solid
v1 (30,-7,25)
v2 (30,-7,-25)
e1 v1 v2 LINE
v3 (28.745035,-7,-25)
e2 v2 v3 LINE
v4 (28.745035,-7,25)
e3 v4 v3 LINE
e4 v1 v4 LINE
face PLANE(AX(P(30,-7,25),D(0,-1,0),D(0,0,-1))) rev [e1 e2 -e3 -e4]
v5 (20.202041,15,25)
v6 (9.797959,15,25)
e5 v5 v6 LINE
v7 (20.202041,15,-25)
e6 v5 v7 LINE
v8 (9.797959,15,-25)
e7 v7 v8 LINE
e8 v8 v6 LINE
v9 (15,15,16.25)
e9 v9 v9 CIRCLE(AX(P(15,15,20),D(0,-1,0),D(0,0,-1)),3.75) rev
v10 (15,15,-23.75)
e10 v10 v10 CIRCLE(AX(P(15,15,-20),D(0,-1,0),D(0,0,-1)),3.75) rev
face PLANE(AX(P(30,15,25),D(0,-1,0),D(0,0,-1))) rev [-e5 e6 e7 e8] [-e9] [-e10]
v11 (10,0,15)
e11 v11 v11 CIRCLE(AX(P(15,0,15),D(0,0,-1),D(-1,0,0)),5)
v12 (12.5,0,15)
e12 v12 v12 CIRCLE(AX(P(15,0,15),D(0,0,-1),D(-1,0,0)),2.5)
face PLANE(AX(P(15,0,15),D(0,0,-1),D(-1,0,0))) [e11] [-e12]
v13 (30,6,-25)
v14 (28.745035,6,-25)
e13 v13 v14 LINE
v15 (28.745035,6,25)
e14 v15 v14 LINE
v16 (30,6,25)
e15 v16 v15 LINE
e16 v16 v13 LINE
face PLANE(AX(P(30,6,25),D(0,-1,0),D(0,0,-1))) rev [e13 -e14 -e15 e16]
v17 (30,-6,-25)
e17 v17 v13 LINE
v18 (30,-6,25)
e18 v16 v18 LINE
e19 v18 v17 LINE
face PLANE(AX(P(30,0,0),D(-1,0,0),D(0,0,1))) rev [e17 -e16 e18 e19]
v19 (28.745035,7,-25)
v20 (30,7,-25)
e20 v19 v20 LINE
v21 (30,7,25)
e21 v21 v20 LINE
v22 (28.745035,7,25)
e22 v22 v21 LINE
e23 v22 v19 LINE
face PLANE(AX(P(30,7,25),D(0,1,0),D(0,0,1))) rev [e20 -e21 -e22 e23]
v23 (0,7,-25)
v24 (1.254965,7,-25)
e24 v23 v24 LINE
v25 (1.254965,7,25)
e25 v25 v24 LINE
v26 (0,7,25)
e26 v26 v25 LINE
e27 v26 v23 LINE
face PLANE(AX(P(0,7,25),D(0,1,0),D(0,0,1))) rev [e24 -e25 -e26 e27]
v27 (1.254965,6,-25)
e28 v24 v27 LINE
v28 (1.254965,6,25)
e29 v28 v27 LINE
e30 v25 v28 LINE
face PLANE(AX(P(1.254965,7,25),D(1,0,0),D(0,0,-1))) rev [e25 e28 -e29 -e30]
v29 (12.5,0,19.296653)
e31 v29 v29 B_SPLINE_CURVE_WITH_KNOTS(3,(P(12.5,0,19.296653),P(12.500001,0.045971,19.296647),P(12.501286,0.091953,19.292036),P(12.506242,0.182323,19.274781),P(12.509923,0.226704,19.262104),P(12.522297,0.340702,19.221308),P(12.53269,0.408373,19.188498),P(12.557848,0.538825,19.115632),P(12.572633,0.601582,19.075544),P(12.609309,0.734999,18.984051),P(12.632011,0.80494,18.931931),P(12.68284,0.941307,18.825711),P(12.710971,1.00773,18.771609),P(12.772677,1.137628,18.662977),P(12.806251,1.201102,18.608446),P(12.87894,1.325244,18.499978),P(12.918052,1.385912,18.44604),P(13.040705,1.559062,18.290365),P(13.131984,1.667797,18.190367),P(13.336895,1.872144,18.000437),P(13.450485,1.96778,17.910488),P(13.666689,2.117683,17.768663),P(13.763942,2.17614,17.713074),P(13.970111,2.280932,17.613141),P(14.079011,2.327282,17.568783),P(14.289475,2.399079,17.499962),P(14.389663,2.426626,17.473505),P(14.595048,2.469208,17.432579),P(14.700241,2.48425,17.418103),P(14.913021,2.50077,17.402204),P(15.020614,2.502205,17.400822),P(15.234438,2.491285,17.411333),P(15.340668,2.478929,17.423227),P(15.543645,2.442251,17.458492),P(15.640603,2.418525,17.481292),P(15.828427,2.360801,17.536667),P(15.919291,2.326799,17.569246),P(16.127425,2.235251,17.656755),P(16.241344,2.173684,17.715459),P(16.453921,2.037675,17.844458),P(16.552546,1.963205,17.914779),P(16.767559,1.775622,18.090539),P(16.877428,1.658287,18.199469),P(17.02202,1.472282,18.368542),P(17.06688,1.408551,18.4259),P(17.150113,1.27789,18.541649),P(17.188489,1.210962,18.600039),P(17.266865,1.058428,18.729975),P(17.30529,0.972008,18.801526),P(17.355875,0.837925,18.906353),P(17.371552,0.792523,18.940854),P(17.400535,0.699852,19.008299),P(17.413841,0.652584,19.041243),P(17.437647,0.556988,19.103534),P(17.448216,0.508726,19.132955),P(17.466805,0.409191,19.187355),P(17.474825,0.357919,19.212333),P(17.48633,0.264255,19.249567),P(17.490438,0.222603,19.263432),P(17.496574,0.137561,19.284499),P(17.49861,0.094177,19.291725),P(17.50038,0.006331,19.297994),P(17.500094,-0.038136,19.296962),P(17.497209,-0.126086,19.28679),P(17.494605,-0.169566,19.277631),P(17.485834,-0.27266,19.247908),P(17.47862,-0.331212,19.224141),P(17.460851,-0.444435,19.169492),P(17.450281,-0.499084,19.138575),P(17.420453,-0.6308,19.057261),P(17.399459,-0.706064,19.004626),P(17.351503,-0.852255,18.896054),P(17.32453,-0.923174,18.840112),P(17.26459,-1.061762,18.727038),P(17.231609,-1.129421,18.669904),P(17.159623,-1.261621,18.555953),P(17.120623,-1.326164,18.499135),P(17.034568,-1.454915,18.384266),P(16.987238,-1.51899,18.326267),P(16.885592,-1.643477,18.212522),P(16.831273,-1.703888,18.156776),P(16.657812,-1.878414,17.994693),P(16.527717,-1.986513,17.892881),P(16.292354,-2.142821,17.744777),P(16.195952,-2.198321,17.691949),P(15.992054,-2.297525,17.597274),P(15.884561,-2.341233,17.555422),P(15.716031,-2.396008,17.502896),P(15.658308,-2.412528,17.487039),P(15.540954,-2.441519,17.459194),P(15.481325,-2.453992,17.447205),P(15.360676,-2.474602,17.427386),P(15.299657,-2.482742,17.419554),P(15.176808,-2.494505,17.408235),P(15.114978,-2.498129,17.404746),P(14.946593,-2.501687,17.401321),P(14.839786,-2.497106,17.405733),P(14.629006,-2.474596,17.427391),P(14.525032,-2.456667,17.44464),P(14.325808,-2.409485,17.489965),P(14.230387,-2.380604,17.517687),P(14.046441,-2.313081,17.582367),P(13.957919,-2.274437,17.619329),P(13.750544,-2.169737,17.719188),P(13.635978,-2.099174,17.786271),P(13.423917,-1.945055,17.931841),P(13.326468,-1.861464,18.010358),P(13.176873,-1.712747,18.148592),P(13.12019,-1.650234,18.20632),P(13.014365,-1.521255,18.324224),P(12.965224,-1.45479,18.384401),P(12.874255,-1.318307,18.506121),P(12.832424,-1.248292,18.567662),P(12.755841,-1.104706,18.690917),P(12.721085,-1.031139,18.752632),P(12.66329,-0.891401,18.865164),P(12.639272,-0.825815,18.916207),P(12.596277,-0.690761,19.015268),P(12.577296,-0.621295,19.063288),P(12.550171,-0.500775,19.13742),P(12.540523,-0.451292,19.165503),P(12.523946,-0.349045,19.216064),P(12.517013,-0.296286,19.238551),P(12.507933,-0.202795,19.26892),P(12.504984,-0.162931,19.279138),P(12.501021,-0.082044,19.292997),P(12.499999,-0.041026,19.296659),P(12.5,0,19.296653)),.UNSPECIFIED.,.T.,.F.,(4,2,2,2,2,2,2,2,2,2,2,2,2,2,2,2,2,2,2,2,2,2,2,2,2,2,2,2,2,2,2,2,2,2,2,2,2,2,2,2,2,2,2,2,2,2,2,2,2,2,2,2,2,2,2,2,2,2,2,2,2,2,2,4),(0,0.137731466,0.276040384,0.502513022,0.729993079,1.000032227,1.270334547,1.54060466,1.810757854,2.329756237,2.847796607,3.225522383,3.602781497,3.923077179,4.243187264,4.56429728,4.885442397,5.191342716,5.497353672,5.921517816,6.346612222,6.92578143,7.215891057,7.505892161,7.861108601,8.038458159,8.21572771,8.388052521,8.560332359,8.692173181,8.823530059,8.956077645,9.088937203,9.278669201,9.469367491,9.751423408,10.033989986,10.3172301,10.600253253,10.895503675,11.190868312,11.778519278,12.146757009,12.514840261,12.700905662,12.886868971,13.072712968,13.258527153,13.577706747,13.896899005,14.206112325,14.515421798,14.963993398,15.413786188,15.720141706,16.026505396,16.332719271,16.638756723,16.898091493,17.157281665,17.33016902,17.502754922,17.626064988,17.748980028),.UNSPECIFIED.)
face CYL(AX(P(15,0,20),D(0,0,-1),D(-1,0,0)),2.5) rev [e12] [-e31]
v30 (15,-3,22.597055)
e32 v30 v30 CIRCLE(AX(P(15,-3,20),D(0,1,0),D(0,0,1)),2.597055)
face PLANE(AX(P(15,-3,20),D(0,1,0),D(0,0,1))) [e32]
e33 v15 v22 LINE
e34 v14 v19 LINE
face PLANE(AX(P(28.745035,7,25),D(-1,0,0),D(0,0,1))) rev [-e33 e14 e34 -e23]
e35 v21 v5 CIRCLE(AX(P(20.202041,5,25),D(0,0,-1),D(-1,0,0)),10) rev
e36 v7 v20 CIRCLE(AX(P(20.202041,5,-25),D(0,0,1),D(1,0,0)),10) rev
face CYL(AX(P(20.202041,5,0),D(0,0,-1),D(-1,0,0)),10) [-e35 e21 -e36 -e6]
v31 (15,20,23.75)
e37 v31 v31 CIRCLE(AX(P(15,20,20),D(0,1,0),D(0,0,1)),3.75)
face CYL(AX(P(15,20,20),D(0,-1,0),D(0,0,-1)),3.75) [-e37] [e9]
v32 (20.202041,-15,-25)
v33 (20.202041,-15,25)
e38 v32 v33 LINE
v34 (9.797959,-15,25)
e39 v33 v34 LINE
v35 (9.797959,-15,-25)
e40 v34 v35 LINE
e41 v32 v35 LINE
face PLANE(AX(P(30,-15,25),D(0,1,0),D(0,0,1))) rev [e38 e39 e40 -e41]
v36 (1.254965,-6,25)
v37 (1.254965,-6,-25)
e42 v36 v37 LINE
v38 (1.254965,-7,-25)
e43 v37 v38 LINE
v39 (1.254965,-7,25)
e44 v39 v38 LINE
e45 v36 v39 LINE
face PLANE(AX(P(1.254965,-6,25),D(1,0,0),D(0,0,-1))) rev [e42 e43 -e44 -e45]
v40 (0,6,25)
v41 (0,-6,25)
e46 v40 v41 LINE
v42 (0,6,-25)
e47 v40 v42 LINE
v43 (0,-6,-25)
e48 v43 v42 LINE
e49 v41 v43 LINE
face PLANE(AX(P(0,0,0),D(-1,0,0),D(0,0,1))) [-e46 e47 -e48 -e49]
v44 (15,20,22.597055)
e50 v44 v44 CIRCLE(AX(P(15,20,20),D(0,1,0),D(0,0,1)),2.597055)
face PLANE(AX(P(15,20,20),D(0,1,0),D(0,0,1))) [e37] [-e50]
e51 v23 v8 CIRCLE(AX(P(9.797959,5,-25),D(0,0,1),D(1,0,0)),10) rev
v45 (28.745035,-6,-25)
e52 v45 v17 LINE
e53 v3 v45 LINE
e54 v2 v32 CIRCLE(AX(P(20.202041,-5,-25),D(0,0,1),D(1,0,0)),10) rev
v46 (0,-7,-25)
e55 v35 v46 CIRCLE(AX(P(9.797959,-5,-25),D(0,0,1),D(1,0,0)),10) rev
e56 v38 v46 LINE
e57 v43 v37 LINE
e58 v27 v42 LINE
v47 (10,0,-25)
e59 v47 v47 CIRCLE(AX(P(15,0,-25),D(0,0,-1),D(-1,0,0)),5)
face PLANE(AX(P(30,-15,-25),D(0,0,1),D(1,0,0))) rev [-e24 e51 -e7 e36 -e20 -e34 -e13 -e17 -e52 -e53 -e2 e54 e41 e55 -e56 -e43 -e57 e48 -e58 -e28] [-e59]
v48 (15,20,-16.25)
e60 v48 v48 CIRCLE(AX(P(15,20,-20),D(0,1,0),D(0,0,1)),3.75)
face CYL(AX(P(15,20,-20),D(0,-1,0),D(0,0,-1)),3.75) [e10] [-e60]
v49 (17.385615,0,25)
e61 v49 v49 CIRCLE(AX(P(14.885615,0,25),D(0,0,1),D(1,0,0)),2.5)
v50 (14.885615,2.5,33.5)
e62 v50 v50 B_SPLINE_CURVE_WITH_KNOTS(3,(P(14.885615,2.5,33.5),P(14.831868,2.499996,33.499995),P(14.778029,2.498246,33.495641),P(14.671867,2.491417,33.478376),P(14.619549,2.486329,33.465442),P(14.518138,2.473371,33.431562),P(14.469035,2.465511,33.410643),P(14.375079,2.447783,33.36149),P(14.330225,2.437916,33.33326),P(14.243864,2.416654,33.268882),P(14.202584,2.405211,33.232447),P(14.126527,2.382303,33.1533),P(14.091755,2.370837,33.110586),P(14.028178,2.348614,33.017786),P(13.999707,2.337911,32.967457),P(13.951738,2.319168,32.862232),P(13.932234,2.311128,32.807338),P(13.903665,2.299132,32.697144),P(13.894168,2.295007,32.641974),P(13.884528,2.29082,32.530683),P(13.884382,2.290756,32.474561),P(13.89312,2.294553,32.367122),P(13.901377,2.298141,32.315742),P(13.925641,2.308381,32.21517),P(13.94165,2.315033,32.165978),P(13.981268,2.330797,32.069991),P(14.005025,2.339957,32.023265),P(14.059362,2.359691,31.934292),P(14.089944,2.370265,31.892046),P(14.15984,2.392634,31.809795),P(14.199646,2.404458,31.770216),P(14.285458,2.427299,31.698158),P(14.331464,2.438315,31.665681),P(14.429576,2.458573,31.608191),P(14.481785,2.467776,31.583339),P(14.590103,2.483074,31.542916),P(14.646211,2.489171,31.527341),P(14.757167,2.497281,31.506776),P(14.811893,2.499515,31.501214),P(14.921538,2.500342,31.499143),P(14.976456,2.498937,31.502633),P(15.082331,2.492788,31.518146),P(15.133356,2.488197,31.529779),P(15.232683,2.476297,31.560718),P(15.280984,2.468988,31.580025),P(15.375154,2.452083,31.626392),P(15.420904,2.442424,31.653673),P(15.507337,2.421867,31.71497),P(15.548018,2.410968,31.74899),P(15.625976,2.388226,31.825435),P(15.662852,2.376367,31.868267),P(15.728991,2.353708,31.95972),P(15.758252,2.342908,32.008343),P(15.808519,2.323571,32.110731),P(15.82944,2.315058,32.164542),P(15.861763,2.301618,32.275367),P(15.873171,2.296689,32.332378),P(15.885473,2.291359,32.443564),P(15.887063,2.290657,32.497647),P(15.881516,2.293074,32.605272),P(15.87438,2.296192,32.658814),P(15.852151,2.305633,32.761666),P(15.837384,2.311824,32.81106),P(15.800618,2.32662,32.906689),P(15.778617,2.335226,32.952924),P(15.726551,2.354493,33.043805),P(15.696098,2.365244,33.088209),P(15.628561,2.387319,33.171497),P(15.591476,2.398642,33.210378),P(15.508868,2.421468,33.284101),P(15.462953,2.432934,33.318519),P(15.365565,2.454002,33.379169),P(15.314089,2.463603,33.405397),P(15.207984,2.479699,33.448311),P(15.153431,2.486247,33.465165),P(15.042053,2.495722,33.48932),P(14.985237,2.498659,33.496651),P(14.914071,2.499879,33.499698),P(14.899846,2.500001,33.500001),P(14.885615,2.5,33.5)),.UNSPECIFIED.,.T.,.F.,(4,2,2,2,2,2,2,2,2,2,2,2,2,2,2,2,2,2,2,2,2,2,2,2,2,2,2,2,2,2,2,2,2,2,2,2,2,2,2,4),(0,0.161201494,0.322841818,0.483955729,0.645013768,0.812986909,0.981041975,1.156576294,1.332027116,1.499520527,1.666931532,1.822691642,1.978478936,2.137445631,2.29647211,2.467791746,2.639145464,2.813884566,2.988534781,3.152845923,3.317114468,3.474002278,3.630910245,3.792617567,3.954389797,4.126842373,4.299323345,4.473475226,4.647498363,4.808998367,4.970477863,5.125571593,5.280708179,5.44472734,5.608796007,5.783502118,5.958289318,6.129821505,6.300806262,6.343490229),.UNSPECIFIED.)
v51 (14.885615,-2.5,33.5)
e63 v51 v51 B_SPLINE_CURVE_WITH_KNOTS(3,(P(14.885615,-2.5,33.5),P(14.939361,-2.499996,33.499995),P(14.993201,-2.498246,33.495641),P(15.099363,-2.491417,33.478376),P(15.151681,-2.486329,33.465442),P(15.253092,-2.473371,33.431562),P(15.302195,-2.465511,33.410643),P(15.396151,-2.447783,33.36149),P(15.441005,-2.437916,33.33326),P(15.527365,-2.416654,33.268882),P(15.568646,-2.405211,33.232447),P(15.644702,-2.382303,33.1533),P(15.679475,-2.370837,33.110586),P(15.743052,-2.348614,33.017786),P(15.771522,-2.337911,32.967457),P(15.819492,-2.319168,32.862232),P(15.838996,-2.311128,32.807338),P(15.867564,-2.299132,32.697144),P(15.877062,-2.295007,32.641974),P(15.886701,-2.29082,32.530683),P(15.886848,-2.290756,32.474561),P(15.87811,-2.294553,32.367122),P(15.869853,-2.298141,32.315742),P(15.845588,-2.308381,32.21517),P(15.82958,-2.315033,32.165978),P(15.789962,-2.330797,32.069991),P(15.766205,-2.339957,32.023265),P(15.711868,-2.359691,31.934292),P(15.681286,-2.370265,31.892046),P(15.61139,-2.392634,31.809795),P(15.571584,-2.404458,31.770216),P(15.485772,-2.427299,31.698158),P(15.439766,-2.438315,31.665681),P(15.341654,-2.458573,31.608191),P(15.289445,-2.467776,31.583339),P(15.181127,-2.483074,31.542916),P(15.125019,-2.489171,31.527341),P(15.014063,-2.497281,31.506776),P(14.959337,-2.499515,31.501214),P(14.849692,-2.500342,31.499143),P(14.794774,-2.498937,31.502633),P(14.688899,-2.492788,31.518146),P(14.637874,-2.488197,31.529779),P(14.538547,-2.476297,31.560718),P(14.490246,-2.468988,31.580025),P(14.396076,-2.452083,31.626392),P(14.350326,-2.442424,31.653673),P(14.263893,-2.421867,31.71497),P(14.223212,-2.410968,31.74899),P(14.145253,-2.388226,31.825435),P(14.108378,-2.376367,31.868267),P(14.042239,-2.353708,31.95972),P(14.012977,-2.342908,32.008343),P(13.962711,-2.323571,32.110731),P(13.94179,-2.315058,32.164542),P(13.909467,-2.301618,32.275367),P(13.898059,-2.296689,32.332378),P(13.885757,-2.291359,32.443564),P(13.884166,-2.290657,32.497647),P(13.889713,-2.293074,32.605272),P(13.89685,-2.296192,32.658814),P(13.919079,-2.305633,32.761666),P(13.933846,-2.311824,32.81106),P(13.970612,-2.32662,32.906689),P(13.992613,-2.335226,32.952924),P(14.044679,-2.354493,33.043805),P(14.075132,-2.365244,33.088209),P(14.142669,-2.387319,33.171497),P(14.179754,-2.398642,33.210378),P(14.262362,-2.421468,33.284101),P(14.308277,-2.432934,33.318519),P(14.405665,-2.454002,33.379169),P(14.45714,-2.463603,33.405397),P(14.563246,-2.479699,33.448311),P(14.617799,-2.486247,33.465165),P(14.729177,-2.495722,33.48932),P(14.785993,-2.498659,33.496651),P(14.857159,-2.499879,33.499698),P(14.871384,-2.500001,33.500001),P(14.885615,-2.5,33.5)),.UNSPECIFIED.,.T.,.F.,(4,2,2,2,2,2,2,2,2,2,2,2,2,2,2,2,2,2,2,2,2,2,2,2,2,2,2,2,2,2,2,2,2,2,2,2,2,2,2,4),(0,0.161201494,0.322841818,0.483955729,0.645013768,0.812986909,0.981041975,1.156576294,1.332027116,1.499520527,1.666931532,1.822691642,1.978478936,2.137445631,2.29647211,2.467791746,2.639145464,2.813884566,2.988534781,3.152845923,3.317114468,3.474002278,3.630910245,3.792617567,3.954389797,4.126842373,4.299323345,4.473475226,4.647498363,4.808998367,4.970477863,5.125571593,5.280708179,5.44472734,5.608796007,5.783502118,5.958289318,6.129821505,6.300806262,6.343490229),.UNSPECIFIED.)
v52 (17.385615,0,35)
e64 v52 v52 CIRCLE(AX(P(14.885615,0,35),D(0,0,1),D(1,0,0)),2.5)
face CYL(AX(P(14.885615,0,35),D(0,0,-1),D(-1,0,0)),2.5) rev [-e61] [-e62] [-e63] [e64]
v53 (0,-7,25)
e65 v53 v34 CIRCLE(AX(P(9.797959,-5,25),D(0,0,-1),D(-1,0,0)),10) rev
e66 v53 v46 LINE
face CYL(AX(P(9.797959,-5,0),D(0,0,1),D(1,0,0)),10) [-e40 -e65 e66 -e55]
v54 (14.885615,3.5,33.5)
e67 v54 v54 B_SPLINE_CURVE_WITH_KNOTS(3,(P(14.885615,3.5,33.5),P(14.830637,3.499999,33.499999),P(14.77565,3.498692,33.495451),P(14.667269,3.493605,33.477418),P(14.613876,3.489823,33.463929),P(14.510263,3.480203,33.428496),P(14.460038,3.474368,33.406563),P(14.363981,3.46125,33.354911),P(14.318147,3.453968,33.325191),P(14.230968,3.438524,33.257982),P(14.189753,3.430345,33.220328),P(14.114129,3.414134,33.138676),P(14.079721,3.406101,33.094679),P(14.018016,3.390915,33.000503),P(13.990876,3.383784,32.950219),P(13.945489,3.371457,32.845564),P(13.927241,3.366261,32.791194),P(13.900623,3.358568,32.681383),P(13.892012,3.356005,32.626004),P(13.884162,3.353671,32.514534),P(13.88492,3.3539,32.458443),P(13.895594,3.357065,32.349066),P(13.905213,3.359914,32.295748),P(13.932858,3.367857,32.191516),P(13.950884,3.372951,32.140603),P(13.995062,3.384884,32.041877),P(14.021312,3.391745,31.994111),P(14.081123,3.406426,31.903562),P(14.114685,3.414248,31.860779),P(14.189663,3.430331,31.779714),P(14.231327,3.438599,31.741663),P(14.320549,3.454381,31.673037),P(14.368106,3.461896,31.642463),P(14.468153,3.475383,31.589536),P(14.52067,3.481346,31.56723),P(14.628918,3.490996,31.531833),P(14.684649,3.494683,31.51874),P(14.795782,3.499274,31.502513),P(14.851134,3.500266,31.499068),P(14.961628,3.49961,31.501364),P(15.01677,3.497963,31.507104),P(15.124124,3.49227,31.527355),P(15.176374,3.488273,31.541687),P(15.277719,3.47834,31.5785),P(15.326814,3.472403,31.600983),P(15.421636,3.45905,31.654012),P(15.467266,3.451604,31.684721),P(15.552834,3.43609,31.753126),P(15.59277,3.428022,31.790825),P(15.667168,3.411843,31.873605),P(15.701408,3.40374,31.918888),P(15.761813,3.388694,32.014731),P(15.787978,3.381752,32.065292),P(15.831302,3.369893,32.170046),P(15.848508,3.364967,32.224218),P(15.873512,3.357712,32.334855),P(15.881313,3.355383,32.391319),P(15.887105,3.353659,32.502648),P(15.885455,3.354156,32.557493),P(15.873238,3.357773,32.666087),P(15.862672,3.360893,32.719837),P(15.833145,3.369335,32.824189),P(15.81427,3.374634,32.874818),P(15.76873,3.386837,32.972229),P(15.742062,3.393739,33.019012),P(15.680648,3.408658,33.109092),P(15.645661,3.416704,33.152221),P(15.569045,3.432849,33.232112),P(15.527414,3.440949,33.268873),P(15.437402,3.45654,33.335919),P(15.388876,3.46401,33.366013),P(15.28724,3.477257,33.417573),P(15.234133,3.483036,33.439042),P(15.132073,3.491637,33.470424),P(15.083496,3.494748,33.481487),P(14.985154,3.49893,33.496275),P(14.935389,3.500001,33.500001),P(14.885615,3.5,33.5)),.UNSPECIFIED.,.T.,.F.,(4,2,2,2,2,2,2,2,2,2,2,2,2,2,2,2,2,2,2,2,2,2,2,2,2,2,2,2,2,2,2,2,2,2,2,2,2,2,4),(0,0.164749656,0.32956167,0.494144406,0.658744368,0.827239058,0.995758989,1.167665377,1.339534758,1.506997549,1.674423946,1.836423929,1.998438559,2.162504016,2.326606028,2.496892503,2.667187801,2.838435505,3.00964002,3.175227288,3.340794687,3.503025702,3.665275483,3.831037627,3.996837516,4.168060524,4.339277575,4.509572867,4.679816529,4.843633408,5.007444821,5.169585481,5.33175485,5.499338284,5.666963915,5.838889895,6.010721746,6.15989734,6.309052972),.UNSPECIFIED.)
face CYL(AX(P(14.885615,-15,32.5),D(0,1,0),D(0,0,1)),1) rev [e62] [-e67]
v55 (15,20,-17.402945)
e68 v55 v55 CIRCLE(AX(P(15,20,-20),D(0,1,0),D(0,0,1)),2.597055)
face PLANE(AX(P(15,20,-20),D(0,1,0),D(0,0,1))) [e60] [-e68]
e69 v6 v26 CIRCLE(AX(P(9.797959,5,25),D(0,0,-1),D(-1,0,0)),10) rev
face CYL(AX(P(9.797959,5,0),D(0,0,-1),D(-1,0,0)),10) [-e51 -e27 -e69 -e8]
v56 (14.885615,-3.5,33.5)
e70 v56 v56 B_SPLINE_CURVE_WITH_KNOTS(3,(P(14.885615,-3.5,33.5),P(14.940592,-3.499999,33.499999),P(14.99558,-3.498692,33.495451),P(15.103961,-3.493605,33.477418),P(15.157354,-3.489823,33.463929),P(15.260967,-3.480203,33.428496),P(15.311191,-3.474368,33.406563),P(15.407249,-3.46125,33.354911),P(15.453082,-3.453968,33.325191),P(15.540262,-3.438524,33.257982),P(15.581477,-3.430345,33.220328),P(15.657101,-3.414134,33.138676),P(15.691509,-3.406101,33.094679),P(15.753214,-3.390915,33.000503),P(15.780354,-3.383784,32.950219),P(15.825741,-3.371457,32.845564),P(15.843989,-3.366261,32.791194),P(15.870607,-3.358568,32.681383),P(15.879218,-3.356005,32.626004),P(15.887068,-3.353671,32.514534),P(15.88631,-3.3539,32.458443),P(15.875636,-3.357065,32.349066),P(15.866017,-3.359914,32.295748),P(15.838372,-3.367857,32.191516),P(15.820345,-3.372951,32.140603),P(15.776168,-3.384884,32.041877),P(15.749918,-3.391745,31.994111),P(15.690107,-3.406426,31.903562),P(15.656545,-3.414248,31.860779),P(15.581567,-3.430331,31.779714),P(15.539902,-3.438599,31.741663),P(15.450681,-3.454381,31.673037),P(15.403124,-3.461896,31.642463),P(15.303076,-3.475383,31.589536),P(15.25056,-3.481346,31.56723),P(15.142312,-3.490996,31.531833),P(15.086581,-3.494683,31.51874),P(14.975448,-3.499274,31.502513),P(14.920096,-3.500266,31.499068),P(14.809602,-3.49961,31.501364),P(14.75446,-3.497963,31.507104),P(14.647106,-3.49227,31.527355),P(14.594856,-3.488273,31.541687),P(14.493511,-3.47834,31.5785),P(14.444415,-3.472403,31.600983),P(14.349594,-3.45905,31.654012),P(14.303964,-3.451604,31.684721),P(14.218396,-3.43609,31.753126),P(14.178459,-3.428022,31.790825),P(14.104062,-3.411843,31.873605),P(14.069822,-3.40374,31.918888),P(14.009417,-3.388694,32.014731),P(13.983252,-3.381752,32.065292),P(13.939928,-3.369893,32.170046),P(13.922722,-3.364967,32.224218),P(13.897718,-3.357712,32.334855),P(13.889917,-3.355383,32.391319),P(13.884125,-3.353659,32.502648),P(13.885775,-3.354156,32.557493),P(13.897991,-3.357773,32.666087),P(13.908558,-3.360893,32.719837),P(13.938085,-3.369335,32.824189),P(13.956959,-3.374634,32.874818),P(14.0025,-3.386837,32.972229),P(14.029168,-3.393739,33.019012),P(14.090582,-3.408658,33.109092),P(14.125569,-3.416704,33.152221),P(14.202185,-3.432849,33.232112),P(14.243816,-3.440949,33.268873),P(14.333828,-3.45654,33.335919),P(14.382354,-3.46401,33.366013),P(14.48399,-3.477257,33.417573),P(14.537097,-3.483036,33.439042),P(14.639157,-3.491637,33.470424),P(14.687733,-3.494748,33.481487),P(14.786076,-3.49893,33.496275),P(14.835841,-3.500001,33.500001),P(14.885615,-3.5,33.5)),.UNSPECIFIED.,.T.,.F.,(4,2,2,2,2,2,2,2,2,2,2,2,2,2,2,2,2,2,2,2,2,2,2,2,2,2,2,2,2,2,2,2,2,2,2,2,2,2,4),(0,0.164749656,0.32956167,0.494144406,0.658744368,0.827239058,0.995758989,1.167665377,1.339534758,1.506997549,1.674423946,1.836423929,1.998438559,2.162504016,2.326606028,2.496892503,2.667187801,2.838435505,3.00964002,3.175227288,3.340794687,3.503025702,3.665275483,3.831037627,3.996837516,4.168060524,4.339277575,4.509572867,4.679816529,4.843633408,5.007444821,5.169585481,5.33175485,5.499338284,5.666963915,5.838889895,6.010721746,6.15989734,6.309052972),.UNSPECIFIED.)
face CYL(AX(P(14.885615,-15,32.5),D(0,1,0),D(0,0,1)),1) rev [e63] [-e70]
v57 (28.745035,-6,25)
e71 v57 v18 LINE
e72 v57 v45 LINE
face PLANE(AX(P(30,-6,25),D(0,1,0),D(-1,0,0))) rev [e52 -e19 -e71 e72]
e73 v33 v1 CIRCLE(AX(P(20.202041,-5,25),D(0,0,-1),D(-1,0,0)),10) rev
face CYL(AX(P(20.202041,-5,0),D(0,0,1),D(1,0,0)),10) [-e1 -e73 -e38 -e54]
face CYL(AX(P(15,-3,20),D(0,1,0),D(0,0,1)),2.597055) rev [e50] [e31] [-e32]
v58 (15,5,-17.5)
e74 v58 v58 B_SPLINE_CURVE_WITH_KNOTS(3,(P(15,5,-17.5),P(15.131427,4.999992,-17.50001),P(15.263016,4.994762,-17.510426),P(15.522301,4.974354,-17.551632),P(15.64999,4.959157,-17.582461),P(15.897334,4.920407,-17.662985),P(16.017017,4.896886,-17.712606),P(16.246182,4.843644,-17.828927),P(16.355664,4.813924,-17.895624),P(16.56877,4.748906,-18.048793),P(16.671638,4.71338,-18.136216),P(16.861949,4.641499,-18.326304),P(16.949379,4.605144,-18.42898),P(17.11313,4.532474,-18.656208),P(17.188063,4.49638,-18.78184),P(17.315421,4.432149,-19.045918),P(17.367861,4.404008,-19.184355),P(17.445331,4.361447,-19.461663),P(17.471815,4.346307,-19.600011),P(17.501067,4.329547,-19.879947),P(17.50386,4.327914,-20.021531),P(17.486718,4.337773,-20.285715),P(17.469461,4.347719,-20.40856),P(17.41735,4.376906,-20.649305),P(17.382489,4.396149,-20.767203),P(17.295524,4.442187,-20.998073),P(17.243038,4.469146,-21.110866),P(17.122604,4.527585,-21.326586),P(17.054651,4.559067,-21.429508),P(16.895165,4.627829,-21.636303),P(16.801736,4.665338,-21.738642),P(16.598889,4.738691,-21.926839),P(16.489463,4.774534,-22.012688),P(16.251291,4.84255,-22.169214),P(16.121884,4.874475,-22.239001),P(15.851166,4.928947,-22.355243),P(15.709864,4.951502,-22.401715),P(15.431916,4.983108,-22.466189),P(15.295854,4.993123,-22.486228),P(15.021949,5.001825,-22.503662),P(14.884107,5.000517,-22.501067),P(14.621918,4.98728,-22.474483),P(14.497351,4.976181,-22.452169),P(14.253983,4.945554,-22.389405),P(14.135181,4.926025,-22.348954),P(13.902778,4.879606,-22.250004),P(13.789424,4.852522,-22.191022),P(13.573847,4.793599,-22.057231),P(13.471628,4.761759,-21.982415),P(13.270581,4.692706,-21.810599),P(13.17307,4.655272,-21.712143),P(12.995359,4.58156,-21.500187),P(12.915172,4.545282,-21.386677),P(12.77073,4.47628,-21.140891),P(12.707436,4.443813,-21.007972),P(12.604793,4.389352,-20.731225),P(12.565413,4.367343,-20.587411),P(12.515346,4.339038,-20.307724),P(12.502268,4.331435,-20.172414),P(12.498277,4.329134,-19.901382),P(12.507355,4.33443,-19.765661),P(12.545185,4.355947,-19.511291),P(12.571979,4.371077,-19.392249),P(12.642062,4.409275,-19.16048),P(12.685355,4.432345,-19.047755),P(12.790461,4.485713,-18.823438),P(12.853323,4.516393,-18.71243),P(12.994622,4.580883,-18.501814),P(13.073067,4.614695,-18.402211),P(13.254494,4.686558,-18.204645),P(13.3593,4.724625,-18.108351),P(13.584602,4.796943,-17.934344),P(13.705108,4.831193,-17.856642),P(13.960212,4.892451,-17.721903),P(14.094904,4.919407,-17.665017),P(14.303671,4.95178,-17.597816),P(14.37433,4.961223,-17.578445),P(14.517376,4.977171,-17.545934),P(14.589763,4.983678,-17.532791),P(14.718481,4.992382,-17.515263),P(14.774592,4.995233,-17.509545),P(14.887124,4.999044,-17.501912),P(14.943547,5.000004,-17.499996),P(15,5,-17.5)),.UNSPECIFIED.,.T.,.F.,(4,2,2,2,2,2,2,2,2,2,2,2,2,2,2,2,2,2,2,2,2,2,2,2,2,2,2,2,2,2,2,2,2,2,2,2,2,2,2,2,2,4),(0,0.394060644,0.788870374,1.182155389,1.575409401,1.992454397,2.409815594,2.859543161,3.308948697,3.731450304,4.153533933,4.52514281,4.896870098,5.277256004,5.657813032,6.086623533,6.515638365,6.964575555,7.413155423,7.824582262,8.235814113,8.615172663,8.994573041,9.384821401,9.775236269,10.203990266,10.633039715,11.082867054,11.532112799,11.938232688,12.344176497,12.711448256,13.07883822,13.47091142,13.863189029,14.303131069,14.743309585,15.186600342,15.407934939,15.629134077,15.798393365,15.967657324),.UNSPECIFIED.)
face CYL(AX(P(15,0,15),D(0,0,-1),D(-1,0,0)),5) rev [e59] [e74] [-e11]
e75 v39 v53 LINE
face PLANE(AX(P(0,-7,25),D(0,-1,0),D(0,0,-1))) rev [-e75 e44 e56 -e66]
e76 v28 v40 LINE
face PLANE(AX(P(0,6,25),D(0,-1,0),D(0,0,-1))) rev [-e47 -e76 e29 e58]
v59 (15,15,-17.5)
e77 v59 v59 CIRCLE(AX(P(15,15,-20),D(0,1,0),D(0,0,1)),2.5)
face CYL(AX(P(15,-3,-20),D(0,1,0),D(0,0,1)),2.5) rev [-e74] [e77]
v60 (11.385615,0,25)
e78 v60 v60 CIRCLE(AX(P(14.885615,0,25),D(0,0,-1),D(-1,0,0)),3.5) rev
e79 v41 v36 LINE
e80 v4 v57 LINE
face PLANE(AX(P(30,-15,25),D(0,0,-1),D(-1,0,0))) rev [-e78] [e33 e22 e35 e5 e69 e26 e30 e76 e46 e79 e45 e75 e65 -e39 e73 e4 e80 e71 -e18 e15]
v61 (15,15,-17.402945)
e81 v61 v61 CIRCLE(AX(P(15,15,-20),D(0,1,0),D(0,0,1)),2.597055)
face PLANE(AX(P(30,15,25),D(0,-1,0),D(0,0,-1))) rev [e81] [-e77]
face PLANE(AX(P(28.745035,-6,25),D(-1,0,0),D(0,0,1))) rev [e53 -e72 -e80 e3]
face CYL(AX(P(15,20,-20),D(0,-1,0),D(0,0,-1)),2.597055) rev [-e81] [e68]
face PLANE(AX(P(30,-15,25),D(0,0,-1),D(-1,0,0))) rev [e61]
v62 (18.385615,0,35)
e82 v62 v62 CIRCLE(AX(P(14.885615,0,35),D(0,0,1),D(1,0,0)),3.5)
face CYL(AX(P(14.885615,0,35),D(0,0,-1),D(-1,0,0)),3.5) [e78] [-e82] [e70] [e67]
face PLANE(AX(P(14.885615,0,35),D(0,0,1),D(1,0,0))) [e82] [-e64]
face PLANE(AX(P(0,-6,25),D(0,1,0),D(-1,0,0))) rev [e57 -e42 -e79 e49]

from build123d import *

# Parameters (mm, degrees)
SKETCH1_W           = 50
SKETCH1_H           = 30
BOSS_EXTRUDE1_DEPTH = 30
SKETCH3_R           = 5
CUT_EXTRUDE1_DEPTH  = 40
SKETCH4_W           = 1.254965376
SKETCH4_H           = 1
CUT_EXTRUDE2_DEPTH  = 61.207972894
SKETCH5_R           = 2.5
SKETCH5_R_2         = 2.597055459
CUT_EXTRUDE3_DEPTH  = 18
BOSS_EXTRUDE2_START = 5
SKETCH6_R           = 3.75
SKETCH6_R_2         = 2.597055459
BOSS_EXTRUDE2_DEPTH = 5
SKETCH7_R           = 2.5
CUT_EXTRUDE4_DEPTH  = 5
SKETCH8_R           = 3.5
SKETCH8_R_2         = 2.5
BOSS_EXTRUDE3_DEPTH = 10
SKETCH9_R           = 1
CUT_EXTRUDE5_DEPTH  = 56
FILLET1_R           = 10


with BuildPart() as part:
    # Sketch1 → Boss-Extrude1 (new body)
    with BuildSketch(Plane(origin=(0, 0, 0), x_dir=(0, 0, -1), z_dir=(1, 0, 0))):
        Rectangle(SKETCH1_W, SKETCH1_H)
    extrude(amount=BOSS_EXTRUDE1_DEPTH)

    # Sketch3 → Cut-Extrude1 (cut)
    with BuildSketch(Plane(origin=(0, 0, -25), x_dir=(-1, 0, 0), z_dir=(0, 0, -1))):
        with Locations((-15, 0)):
            Circle(SKETCH3_R)
    extrude(amount=-CUT_EXTRUDE1_DEPTH, mode=Mode.SUBTRACT)

    # Sketch4 → Cut-Extrude2 (cut, through all)
    with BuildSketch(Plane(origin=(0, 0, -25), x_dir=(-1, 0, 0), z_dir=(0, 0, -1))):
        with Locations((-29.372517312, 6.5)):
            Rectangle(SKETCH4_W, SKETCH4_H)
        with Locations((-29.372517312, -6.5)):
            Rectangle(SKETCH4_W, SKETCH4_H)
        with Locations((-0.627482688, -6.5)):
            Rectangle(SKETCH4_W, SKETCH4_H)
        with Locations((-0.627482688, 6.5)):
            Rectangle(SKETCH4_W, SKETCH4_H)
    extrude(amount=-CUT_EXTRUDE2_DEPTH, mode=Mode.SUBTRACT)

    # Sketch5 → Cut-Extrude3 (cut)
    with BuildSketch(Plane(origin=(0, 15, 0), x_dir=(1, 0, 0), z_dir=(0, 1, 0))):
        with Locations(Location((15, 20, 0), (0, 0, 270))):
            Circle(SKETCH5_R)
        with Locations(Location((15, -20, 0), (0, 0, 270))):
            Circle(SKETCH5_R_2)
    extrude(amount=-CUT_EXTRUDE3_DEPTH, mode=Mode.SUBTRACT)

    # Sketch6 → Boss-Extrude2 (add)
    # profile 1 of 2: a face of its own
    with BuildSketch(Plane(origin=(0, 15, 0), x_dir=(1, 0, 0), z_dir=(0, 1, 0)).offset(BOSS_EXTRUDE2_START)):
        with Locations(Location((15, -20, 0), (0, 0, 90))):
            Circle(SKETCH6_R)
        with Locations(Location((15, -20, 0), (0, 0, 270))):
            Circle(SKETCH6_R_2, mode=Mode.SUBTRACT)
    # profile 2 of 2: a face of its own
    with BuildSketch(Plane(origin=(0, 15, 0), x_dir=(1, 0, 0), z_dir=(0, 1, 0)).offset(BOSS_EXTRUDE2_START)):
        with Locations(Location((15, 20, 0), (0, 0, 90))):
            Circle(SKETCH6_R)
        with Locations(Location((15, 20, 0), (0, 0, 270))):
            Circle(SKETCH6_R_2, mode=Mode.SUBTRACT)
    extrude(amount=-BOSS_EXTRUDE2_DEPTH)

    # Sketch7 → Cut-Extrude4 (cut)
    with BuildSketch(Plane(origin=(0, 0, 15), x_dir=(-1, 0, 0), z_dir=(0, 0, -1))):
        with Locations((-15, 0)):
            Circle(SKETCH7_R)
    extrude(amount=-CUT_EXTRUDE4_DEPTH, mode=Mode.SUBTRACT)

    # Sketch8 → Boss-Extrude3 (add)
    with BuildSketch(Plane.XY.offset(25)):
        with Locations(Location((14.885614907, 0, 0), (0, 0, 180))):
            Circle(SKETCH8_R)
        with Locations((14.885614907, 0)):
            Circle(SKETCH8_R_2, mode=Mode.SUBTRACT)
    extrude(amount=BOSS_EXTRUDE3_DEPTH)

    # Sketch9 → Cut-Extrude5 (cut, through all)
    with BuildSketch(Plane(origin=(0, 15, 0), x_dir=(1, 0, 0), z_dir=(0, 1, 0))):
        with Locations(Location((14.885614907, -32.5, 0), (0, 0, 270))):
            Circle(SKETCH9_R)
    extrude(amount=-CUT_EXTRUDE5_DEPTH, mode=Mode.SUBTRACT)

    # Fillet1
    # the kernel refuses this fillet: 10 mm, written as the material it takes off along each edge
    with BuildSketch(Plane(origin=(30, -15, 49.494897428), x_dir=(-1, 0, 0), z_dir=(0, 0, -1)), Plane(origin=(30, 15, -49.494897428), x_dir=(-1, 0, 0), z_dir=(0, 0, 1))) as fillet1_piece_1:
        with BuildLine():
            CenterArc((9.797958971, 10), FILLET1_R, 191.536959033, 78.463040967)
            Line((0, 8), (-0.195959179, 7.96))
            ThreePointArc((-0.195959179, 7.96), (-0.2, 4), (-0.2, 0))
            Line((-0.2, 0), (0, -0.2))
            Line((0, -0.2), (9.797958971, -0.2))
            Line((9.797958971, -0.2), (9.797958971, 0))
        make_face()
    extrude(amount=98.989794856, mode=Mode.SUBTRACT)
    with BuildSketch(Plane(origin=(0, -15, 49.494897428), x_dir=(1, 0, 0), z_dir=(0, 0, -1))) as fillet1_piece_2:
        with BuildLine():
            CenterArc((9.797958971, -10), FILLET1_R, 90, 78.463040967)
            Line((0, -8), (-0.195959179, -7.96))
            ThreePointArc((-0.195959179, -7.96), (-0.2, -4), (-0.2, 0))
            Line((-0.2, 0), (0, 0.2))
            Line((0, 0.2), (9.797958971, 0.2))
            Line((9.797958971, 0.2), (9.797958971, 0))
        make_face()
    extrude(amount=98.989794856, mode=Mode.SUBTRACT)
    with BuildSketch(Plane(origin=(0, 15, -49.494897428), x_dir=(0, -1, 0), z_dir=(0, 0, 1))) as fillet1_piece_3:
        with BuildLine():
            CenterArc((10, 9.797958971), FILLET1_R, 180, 78.463040967)
            Line((0, 9.797958971), (-0.2, 9.797958971))
            Line((-0.2, 9.797958971), (-0.2, 0))
            Line((-0.2, 0), (0, -0.2))
            ThreePointArc((0, -0.2), (4, -0.2), (7.96, -0.195959179))
            Line((7.96, -0.195959179), (8, 0))
        make_face()
    extrude(amount=98.989794856, mode=Mode.SUBTRACT)


solid = part.part
